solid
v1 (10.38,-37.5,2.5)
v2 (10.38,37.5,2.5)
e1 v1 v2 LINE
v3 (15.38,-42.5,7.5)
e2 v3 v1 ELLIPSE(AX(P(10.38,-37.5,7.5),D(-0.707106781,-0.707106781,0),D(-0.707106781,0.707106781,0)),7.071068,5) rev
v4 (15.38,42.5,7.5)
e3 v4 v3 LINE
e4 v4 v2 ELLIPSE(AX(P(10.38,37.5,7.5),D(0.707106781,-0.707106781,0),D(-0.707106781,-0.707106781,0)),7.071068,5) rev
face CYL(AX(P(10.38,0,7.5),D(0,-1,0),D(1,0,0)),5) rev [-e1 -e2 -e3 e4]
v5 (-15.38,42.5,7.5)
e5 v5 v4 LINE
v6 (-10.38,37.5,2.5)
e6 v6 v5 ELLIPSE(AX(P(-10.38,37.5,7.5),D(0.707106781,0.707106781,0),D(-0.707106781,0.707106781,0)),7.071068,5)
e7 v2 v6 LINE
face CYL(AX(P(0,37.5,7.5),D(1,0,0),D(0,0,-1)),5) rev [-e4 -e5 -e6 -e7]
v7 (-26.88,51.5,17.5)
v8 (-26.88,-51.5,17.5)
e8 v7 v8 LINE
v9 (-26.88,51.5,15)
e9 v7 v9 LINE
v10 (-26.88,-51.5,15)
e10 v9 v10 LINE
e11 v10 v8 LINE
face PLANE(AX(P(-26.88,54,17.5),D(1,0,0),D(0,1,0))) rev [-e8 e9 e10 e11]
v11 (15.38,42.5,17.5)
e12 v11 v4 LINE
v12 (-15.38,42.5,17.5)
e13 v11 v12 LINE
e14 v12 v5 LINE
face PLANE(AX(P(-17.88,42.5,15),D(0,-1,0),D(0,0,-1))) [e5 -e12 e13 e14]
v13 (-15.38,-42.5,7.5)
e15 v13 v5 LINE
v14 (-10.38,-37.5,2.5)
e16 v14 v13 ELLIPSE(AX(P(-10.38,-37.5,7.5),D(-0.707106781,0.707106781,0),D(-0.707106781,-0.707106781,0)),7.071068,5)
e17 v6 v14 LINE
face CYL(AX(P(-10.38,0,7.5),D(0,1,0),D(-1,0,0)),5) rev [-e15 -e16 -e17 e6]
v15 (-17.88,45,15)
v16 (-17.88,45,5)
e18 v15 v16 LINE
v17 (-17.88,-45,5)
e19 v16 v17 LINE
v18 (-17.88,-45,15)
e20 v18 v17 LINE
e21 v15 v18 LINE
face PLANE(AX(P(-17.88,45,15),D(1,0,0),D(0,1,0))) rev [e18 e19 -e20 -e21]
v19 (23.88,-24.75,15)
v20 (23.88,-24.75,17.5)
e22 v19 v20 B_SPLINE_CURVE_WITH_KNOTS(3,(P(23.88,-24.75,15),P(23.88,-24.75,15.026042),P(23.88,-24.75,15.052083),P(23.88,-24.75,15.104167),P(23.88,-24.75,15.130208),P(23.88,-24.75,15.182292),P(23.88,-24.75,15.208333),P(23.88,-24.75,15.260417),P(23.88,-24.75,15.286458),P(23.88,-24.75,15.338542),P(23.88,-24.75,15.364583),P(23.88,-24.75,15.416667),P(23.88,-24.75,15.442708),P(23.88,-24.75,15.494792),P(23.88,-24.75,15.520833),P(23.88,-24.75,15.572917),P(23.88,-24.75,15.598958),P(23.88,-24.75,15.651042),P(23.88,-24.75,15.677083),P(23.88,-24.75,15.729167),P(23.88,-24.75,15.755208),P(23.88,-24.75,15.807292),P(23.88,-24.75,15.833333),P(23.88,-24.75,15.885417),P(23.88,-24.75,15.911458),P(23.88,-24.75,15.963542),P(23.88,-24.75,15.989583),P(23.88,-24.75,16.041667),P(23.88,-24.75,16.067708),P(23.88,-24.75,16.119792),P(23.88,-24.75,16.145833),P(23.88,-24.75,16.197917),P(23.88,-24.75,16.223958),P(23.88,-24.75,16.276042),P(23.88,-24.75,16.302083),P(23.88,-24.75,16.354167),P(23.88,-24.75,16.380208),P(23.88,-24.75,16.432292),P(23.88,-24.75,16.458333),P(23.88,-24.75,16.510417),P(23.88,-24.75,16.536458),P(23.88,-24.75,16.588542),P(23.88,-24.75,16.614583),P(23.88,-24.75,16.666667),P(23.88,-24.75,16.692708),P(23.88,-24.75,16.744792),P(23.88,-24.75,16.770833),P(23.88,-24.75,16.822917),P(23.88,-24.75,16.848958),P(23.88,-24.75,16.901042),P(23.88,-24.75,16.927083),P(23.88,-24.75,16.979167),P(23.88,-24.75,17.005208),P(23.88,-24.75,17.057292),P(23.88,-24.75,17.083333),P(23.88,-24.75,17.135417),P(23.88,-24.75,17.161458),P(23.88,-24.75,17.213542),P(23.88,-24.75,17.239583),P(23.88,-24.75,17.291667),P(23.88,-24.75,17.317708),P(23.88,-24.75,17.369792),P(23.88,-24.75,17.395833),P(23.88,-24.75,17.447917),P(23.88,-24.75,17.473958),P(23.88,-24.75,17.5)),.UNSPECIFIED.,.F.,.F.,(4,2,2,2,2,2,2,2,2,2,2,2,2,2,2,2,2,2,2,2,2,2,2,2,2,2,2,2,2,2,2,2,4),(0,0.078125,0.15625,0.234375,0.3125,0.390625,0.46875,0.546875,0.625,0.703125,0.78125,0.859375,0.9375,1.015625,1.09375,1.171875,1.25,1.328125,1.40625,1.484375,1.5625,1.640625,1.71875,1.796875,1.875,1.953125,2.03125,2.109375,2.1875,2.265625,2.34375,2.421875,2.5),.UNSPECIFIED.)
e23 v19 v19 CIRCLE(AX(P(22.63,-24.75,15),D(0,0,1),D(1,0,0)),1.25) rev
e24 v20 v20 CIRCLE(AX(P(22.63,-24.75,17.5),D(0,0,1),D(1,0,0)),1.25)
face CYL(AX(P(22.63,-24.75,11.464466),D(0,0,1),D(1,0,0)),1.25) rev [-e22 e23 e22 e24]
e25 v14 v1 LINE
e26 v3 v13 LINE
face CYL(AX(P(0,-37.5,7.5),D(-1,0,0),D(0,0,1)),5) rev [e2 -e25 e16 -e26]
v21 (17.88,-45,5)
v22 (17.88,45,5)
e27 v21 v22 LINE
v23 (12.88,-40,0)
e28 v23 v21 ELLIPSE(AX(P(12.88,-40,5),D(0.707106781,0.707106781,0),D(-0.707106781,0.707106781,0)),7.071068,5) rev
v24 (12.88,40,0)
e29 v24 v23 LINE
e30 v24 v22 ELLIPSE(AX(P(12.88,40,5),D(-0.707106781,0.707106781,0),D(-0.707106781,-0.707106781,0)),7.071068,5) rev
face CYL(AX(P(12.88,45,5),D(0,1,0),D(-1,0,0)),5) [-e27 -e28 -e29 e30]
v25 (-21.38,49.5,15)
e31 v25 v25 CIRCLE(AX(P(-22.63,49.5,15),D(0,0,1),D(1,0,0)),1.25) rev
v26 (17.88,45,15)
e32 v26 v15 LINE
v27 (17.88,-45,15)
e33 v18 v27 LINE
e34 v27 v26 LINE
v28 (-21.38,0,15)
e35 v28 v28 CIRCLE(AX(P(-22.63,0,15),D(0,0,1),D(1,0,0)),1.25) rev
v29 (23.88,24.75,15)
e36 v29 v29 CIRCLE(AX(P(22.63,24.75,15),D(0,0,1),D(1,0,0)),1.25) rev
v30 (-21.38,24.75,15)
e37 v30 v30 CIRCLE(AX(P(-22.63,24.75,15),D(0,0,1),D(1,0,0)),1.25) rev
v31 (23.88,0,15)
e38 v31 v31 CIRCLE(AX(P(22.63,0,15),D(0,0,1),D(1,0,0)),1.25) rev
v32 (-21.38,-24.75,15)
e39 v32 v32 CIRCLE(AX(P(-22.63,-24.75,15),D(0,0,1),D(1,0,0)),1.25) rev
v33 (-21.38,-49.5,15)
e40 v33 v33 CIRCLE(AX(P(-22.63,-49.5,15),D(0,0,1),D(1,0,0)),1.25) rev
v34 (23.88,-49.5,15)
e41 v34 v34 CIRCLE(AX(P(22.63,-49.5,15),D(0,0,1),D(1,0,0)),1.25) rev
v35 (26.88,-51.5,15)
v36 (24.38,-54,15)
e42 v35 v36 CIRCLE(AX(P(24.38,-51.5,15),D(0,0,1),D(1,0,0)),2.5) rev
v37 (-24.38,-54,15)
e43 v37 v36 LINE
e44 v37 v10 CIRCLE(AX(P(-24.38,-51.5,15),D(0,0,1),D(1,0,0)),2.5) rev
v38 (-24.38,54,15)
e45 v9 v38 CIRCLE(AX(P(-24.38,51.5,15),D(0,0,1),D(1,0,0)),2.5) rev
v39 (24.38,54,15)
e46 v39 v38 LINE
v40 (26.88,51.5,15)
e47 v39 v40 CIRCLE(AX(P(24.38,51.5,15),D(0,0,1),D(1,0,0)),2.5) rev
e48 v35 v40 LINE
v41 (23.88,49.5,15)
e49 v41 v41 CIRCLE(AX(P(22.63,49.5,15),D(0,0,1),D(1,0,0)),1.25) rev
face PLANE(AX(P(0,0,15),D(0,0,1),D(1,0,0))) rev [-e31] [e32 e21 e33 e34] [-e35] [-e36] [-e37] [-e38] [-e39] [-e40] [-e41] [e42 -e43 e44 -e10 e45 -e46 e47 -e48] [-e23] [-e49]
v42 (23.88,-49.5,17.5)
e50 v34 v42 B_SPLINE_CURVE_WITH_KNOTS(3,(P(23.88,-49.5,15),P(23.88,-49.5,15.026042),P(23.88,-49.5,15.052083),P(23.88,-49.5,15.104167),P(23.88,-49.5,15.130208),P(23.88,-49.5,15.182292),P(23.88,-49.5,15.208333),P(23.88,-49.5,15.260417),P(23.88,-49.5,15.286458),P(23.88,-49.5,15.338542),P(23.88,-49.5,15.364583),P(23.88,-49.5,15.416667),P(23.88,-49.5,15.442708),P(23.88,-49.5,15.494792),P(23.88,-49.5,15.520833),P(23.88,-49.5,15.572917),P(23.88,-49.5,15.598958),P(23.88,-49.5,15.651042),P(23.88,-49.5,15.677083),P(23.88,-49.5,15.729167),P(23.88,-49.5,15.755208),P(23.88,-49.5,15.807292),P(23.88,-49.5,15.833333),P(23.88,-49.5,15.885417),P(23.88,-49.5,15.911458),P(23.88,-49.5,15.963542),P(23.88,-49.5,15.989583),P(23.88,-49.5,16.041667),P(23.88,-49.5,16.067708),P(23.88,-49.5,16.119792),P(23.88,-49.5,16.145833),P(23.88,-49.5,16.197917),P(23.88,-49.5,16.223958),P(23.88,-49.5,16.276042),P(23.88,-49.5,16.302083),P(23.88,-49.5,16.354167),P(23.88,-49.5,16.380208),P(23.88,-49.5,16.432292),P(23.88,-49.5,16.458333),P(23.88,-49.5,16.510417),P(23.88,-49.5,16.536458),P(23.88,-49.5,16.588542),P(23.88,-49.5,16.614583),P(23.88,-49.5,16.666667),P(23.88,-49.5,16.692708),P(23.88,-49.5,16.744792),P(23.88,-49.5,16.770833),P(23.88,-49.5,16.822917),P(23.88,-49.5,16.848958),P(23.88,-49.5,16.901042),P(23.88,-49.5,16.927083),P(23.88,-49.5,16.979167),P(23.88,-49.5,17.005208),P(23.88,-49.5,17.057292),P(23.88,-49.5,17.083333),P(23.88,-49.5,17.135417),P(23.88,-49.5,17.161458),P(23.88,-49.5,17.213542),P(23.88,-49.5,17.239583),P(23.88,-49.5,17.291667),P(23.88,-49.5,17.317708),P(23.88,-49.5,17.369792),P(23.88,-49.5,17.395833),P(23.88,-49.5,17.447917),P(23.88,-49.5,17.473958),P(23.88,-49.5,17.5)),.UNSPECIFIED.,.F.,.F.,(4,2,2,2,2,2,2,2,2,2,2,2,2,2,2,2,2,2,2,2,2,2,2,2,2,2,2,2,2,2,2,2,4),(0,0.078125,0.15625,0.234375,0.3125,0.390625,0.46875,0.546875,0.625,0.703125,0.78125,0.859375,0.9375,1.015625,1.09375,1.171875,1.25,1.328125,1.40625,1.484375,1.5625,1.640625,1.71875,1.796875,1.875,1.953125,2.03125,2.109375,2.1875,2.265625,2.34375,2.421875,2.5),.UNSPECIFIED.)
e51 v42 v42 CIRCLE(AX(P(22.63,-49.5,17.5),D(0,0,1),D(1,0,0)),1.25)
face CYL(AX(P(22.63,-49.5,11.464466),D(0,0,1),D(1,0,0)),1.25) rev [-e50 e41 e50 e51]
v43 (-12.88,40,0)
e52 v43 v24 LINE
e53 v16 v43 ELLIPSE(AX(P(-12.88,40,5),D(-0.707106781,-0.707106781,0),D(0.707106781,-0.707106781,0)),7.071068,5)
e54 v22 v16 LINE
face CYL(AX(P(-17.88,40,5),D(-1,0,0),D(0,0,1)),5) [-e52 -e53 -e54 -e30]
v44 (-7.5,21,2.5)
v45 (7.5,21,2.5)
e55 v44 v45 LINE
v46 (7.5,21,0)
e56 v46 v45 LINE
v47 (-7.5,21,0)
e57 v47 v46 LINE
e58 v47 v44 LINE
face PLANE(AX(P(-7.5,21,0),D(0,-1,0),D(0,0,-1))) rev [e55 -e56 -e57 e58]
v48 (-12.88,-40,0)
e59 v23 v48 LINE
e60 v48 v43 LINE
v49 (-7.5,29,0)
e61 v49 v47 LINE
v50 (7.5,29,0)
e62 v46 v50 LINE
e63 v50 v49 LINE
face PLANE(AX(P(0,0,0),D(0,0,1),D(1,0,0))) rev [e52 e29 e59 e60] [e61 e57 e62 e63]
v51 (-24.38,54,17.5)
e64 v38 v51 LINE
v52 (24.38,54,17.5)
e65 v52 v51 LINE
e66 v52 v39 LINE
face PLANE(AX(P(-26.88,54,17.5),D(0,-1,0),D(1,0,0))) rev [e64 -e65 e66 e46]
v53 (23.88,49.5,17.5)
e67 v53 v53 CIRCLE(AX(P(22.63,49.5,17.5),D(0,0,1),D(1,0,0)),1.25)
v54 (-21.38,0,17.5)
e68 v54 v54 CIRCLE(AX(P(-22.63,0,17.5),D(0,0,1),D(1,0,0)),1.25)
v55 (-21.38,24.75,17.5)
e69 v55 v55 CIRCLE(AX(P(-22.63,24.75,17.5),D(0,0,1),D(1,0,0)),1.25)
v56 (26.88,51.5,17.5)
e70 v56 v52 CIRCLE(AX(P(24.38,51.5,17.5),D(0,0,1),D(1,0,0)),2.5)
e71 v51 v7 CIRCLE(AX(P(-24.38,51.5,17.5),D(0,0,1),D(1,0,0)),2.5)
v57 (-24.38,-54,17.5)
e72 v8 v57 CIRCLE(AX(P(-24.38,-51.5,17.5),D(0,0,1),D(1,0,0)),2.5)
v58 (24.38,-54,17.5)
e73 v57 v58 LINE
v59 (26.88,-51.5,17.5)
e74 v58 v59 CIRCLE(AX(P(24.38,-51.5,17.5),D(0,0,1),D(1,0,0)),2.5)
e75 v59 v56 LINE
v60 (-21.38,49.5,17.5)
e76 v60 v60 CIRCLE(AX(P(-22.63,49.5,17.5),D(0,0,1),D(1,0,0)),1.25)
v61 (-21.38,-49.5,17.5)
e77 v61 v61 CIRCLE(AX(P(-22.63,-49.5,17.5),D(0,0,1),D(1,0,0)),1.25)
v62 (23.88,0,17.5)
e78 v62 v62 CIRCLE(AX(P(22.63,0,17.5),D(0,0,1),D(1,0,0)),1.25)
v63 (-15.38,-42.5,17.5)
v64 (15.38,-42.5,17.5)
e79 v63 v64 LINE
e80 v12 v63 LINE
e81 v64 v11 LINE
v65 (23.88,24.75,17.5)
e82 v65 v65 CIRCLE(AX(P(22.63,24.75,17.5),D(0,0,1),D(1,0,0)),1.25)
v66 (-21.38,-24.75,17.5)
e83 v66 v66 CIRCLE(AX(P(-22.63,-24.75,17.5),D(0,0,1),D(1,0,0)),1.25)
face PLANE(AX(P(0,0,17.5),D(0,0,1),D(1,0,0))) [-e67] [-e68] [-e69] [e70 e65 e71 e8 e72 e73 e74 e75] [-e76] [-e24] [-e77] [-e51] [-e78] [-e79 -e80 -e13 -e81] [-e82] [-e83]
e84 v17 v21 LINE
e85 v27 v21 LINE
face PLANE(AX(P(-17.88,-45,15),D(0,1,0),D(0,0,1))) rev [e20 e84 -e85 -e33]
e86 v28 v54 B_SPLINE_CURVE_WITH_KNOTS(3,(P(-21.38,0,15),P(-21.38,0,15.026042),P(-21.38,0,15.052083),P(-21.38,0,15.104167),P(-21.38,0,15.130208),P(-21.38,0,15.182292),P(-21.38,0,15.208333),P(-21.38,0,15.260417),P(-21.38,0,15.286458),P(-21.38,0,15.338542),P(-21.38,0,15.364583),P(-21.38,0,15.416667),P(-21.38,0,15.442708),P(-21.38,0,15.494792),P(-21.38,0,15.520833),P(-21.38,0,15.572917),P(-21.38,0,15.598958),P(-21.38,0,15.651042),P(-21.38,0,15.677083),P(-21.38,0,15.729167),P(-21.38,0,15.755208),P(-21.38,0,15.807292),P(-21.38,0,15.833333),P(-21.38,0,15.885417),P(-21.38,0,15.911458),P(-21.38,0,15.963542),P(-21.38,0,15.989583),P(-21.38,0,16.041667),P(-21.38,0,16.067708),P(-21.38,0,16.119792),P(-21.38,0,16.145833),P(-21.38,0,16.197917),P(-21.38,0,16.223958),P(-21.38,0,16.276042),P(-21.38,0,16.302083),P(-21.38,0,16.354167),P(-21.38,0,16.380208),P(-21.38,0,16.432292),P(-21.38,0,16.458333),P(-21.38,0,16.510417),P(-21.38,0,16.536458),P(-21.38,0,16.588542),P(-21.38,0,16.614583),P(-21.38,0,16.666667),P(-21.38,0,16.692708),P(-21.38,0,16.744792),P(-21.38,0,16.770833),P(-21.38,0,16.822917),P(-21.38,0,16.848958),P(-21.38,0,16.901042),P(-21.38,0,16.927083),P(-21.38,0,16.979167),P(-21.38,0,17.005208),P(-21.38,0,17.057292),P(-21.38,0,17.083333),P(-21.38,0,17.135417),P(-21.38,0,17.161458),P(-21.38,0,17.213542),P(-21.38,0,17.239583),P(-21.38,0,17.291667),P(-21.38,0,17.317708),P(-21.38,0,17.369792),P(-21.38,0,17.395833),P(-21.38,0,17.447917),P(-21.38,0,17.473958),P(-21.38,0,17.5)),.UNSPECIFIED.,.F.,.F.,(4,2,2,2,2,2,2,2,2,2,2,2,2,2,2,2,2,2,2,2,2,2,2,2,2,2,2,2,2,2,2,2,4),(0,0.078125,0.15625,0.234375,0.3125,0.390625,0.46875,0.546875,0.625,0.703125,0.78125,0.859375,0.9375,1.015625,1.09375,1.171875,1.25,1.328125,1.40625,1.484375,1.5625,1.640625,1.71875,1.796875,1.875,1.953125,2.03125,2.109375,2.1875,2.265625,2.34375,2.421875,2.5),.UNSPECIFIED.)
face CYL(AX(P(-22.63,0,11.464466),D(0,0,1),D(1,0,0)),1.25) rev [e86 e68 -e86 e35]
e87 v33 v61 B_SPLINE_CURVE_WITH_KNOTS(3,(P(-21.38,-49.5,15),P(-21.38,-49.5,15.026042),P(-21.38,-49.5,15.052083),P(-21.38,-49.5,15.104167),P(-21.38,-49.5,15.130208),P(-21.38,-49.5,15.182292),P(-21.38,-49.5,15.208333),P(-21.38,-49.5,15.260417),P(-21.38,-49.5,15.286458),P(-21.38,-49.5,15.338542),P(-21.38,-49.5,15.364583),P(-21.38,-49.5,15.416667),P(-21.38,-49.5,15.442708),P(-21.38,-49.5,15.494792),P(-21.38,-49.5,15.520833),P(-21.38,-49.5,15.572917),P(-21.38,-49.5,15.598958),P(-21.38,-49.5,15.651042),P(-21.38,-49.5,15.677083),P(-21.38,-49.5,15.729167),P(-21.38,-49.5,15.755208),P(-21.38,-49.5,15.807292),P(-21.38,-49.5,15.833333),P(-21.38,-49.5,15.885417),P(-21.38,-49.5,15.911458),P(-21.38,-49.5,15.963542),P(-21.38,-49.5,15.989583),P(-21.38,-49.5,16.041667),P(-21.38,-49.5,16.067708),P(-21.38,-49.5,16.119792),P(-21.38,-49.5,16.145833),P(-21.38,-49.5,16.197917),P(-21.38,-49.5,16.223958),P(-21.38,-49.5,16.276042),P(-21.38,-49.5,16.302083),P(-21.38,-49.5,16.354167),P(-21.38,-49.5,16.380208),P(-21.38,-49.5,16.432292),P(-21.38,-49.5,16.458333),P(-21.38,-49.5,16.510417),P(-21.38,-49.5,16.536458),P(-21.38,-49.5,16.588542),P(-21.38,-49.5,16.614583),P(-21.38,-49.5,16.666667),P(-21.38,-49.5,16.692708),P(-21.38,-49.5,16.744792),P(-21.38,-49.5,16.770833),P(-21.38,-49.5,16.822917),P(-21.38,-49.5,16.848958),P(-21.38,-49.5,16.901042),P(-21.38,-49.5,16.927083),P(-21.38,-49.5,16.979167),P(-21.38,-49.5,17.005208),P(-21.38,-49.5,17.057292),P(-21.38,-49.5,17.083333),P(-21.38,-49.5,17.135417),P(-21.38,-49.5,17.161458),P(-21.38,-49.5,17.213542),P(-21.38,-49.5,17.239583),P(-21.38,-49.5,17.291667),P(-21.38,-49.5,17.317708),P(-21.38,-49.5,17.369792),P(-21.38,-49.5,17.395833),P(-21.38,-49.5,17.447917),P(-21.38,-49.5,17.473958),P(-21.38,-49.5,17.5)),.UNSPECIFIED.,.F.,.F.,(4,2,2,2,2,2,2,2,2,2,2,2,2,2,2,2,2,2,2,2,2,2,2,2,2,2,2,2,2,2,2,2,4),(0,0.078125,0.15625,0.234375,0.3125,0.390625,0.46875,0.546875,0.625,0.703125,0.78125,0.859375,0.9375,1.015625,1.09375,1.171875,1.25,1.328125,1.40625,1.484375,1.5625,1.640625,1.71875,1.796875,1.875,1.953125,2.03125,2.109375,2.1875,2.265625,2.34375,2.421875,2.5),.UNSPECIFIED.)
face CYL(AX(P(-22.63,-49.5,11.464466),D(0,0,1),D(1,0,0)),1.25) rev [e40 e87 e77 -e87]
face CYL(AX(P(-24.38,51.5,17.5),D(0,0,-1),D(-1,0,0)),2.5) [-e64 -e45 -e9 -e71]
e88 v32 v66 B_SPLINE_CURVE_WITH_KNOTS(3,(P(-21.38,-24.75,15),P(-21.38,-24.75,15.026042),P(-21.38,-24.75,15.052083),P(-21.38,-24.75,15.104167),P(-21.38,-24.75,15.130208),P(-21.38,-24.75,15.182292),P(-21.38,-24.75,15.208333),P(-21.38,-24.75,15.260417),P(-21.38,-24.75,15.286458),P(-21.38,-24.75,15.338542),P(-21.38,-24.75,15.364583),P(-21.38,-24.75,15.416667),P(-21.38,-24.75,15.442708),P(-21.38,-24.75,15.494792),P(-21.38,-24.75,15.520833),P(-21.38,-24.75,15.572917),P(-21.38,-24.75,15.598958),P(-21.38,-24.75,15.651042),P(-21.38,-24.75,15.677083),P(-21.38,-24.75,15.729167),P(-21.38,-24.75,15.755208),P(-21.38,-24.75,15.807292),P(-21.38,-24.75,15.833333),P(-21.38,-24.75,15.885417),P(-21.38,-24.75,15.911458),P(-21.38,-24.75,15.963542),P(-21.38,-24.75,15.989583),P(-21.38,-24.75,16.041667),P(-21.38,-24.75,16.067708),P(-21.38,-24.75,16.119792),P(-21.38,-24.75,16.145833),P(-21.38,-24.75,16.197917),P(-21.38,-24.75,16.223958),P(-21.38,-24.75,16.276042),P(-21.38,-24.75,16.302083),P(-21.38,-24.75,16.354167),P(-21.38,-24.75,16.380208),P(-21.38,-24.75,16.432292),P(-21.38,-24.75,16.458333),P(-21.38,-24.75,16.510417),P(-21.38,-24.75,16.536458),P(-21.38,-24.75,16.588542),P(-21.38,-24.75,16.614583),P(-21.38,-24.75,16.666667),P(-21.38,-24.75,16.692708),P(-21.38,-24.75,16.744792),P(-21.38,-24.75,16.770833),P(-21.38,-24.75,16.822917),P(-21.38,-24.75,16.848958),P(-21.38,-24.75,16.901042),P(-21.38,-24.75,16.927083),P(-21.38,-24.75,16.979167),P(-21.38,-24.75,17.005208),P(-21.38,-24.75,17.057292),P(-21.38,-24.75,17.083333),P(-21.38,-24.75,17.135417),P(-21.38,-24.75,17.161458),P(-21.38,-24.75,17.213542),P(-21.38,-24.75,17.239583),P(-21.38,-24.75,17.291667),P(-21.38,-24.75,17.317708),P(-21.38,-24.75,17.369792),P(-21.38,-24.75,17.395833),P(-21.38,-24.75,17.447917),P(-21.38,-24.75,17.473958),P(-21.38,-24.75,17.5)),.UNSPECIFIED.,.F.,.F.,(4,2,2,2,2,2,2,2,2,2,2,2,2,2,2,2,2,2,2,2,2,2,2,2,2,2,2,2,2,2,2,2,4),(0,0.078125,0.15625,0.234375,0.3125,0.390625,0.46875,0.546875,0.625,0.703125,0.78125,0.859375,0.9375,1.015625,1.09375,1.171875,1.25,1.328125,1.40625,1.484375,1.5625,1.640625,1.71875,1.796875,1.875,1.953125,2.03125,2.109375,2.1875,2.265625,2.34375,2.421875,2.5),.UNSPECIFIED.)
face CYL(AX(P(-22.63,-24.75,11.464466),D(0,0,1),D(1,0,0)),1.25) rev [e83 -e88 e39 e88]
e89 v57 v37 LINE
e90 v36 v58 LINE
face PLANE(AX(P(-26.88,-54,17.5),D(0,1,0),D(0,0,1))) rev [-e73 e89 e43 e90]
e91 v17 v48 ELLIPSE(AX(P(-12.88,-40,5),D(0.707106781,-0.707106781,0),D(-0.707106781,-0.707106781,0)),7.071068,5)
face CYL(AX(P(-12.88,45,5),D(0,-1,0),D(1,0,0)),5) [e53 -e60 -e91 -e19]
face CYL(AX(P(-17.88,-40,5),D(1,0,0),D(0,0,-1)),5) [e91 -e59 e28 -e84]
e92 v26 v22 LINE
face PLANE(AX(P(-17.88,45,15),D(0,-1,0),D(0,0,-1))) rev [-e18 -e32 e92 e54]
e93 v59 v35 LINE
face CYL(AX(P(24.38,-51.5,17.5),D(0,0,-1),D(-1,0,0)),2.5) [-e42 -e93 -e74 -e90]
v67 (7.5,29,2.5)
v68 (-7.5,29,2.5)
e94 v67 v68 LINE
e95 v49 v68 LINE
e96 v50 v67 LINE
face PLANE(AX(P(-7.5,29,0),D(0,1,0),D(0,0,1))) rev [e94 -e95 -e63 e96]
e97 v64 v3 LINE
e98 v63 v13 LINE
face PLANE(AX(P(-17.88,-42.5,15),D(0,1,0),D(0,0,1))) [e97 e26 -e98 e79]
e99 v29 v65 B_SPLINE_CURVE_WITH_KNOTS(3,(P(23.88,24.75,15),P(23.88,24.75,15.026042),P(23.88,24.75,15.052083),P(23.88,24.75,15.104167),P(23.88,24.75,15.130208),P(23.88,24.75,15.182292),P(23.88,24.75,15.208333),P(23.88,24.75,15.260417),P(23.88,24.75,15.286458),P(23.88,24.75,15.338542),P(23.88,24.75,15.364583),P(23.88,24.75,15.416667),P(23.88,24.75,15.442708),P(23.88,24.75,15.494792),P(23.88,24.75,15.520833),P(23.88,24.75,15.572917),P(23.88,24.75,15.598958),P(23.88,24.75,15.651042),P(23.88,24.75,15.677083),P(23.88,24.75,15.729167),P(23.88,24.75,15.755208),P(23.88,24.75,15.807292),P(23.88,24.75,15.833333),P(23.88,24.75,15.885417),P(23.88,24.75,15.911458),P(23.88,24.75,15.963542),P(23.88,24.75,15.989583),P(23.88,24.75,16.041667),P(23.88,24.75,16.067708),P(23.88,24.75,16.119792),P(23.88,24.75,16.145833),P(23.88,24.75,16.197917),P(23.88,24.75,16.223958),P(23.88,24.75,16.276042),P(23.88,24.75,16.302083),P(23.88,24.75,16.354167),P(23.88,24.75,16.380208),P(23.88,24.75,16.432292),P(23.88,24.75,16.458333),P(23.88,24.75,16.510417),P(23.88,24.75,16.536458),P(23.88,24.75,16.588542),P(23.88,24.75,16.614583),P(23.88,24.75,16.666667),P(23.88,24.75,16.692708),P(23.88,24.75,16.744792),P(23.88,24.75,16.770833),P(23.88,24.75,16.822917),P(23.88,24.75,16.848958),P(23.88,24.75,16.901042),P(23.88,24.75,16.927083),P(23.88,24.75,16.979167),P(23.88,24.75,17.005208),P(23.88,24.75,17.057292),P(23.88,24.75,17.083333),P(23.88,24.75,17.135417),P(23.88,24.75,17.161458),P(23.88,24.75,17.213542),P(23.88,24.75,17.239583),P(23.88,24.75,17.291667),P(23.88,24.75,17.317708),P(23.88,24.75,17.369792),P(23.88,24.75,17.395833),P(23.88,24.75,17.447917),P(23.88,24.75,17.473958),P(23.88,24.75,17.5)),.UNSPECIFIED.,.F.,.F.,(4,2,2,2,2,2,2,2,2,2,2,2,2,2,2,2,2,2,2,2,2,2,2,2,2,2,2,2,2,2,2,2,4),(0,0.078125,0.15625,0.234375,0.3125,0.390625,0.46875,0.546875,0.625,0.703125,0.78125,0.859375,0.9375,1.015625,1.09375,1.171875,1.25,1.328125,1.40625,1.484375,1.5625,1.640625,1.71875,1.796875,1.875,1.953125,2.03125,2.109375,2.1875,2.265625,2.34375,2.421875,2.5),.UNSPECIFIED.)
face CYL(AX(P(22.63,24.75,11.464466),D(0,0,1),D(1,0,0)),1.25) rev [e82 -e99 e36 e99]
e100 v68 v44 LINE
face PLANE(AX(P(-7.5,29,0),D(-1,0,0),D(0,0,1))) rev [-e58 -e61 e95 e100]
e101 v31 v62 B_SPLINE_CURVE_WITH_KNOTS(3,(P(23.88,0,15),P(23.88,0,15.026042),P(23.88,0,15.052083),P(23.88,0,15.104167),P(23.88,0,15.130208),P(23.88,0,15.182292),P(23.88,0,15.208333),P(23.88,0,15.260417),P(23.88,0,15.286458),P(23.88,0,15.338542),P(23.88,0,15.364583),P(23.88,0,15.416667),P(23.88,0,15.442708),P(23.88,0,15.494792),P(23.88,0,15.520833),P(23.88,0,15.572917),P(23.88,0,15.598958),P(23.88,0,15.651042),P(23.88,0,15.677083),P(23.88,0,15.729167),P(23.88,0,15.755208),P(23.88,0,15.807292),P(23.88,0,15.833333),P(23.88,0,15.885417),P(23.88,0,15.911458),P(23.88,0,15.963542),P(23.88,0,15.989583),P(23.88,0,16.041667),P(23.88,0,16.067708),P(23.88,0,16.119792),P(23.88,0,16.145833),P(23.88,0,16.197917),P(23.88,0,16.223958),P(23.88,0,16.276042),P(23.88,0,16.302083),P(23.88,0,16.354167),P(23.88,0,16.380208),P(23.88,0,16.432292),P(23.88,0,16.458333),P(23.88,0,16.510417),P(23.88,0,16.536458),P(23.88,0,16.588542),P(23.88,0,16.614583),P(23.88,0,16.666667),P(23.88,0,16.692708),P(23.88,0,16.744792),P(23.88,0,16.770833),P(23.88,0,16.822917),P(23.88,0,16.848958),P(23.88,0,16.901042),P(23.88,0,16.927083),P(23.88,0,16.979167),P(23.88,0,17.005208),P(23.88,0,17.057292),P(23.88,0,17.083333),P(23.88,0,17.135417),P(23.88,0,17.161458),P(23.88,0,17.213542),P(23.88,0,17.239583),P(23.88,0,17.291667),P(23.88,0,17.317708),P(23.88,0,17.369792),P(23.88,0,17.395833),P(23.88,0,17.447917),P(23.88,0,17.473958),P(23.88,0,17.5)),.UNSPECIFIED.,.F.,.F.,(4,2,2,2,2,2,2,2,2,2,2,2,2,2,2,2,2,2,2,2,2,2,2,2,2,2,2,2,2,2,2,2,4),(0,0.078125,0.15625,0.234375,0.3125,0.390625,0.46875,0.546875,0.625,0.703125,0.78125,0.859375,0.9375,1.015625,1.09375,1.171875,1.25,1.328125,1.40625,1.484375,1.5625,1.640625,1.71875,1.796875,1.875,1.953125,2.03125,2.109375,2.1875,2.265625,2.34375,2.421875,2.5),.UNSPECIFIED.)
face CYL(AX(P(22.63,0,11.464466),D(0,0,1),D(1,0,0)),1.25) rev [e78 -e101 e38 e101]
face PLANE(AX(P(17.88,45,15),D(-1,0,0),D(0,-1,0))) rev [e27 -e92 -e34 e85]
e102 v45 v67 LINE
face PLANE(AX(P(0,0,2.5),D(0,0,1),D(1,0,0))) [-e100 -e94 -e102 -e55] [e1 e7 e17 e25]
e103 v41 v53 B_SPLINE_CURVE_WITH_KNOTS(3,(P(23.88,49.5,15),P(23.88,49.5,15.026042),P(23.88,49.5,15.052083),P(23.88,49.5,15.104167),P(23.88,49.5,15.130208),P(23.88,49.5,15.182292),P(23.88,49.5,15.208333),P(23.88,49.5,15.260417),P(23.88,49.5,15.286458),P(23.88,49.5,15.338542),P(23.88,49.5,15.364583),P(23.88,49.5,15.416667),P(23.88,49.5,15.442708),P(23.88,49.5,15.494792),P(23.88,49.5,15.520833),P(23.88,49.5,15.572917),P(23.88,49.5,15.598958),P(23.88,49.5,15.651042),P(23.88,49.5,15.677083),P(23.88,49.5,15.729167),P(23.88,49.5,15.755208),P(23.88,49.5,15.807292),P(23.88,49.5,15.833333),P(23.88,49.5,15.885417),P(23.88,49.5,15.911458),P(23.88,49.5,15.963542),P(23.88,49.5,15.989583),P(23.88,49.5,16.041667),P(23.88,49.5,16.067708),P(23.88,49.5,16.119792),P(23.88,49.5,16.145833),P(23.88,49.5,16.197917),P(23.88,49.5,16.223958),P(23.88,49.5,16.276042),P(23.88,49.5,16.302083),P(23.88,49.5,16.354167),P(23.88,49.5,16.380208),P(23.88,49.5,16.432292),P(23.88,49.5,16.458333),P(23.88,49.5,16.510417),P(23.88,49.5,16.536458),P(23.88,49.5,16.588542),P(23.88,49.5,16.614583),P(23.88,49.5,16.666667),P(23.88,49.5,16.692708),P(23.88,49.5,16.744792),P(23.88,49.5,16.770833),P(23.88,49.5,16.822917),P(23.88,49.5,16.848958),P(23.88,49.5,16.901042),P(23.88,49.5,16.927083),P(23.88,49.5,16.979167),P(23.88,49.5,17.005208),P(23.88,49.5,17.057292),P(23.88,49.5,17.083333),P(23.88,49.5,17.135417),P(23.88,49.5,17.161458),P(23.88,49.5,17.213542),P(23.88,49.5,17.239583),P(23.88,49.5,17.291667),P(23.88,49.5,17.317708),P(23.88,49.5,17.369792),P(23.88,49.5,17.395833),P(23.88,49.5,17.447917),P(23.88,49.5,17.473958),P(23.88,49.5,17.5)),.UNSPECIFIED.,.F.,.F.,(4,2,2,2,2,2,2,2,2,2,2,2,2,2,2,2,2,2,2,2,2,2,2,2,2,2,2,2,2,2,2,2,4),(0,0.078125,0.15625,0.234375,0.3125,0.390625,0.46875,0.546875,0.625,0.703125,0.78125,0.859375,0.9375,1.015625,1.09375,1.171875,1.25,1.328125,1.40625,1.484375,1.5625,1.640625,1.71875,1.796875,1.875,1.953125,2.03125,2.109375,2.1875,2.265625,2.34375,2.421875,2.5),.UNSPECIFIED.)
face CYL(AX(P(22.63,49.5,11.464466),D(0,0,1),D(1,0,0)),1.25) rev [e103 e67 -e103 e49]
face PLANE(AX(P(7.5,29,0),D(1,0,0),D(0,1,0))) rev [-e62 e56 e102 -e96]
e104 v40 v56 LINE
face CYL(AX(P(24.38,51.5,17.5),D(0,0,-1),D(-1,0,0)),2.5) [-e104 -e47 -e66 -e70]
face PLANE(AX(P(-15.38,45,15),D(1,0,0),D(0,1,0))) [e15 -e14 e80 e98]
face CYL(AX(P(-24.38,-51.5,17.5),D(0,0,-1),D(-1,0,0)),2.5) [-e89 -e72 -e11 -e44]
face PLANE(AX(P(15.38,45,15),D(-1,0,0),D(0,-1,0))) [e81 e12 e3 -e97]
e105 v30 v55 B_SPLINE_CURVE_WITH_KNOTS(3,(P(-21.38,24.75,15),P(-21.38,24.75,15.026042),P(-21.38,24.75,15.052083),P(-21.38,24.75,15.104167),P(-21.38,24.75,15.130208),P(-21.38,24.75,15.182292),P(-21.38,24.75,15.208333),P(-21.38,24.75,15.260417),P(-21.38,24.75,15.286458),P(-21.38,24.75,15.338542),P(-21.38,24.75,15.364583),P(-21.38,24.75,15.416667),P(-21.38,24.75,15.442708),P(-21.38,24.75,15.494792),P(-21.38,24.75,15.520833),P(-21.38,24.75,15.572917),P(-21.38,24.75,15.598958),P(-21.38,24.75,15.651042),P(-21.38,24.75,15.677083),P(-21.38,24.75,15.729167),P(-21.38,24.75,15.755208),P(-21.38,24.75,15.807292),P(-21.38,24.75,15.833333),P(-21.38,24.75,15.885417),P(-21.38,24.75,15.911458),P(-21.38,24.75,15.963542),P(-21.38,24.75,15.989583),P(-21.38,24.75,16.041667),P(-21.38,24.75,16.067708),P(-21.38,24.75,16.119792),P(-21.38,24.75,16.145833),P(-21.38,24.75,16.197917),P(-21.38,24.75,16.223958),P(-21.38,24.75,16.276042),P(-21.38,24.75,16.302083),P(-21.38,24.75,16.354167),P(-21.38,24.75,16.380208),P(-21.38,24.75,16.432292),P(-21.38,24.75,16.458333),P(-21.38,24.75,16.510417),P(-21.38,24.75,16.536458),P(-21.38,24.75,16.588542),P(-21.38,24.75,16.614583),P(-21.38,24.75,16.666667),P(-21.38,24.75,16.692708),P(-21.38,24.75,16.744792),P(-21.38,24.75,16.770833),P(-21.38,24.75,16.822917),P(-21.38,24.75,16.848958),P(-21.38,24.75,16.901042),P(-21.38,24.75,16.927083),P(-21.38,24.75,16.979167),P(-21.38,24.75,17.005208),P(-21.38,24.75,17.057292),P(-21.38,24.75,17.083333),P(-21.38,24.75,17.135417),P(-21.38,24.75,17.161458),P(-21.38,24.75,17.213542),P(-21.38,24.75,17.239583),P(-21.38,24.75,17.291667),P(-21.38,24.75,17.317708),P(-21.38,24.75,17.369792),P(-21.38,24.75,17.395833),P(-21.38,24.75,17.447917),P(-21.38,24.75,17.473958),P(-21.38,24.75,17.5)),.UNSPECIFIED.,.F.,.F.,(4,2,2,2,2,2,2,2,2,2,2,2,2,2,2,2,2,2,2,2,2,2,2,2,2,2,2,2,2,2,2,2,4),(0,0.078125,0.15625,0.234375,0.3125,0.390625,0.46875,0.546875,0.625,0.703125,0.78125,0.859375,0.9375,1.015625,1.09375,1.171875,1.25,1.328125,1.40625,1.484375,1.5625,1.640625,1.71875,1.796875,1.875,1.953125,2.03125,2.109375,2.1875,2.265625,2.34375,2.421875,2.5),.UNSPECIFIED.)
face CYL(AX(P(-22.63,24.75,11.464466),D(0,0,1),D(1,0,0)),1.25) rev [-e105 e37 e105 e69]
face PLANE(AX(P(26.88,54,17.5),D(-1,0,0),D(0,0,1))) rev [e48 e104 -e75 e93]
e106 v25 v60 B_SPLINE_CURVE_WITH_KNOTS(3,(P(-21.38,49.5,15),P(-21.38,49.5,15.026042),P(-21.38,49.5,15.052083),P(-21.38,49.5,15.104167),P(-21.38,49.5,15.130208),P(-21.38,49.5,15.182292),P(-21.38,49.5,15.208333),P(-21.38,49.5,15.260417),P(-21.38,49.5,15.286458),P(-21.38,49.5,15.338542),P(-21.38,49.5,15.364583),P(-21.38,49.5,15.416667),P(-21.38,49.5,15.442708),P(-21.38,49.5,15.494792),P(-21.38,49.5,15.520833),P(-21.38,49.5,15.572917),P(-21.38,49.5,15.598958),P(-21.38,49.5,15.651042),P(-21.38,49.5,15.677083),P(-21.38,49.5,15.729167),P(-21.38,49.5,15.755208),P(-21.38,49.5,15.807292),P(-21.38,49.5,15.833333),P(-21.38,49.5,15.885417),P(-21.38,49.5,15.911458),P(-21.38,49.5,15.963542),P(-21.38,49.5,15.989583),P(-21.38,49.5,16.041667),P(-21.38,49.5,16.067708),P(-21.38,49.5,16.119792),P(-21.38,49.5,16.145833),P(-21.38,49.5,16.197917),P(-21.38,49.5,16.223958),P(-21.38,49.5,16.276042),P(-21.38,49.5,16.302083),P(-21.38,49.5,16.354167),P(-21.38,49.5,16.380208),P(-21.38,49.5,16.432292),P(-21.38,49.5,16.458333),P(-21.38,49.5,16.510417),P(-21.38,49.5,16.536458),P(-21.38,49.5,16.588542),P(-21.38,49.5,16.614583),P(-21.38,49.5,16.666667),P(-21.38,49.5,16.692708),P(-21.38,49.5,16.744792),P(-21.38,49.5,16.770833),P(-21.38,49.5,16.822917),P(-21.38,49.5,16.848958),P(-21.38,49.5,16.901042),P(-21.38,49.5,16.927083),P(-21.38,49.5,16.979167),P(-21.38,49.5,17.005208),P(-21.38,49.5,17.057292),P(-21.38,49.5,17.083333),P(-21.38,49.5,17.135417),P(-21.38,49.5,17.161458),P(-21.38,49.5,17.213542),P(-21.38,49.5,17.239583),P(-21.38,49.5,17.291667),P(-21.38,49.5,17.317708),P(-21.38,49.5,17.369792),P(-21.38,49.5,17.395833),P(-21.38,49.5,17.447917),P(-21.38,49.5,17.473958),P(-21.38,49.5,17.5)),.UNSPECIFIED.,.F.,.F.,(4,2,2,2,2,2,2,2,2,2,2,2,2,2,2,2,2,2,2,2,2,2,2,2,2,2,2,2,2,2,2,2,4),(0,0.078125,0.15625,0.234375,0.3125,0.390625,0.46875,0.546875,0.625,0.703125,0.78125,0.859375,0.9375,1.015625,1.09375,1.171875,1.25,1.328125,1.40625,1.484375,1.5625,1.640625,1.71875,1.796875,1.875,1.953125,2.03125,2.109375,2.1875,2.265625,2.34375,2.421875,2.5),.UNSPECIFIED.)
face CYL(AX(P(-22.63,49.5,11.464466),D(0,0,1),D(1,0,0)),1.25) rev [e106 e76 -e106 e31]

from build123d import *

# Parameters (mm, degrees)
SKETCH1_W           = 35.76
SKETCH1_H           = 90
BOSS_EXTRUDE1_DEPTH = 15
SKETCH2_W           = 53.76
SKETCH2_H           = 108
BOSS_EXTRUDE2_DEPTH = 2.5
SHELL1_START        = -15.38
SHELL1_OUTLINE_W    = 85
SHELL1_OUTLINE_H    = 15
SHELL1_DEPTH        = 30.76
FILLET1_R           = 2.5
FILLET2_R           = 5
SKETCH3_W           = 15
SKETCH3_H           = 8
CUT_EXTRUDE1_DEPTH  = 63.15733585
SKETCH4_R           = 1.25
CUT_EXTRUDE2_DEPTH  = 2.5


# Read off the part's stored shape, not the designer's step: Shell1
with BuildPart() as part:
    # Sketch1 → Boss-Extrude1 (new body)
    with BuildSketch(Plane.XY):
        Rectangle(SKETCH1_W, SKETCH1_H)
    extrude(amount=BOSS_EXTRUDE1_DEPTH)

    # Sketch2 → Boss-Extrude2 (add)
    with BuildSketch(Plane.XY.offset(15)):
        Rectangle(SKETCH2_W, SKETCH2_H)
    extrude(amount=BOSS_EXTRUDE2_DEPTH)

    # Shell1 outline → Shell1 (cut)
    with BuildSketch(Plane.YZ.offset(SHELL1_START)):
        with Locations((0, 10)):
            Rectangle(SHELL1_OUTLINE_W, SHELL1_OUTLINE_H)
    extrude(amount=SHELL1_DEPTH, mode=Mode.SUBTRACT)

    # Fillet1
    fillet1_edges = [part.edges().sort_by_distance(p)[0] for p in [
        (26.88, -54, 16.25),
        (26.88, 54, 16.25),
        (-26.88, 54, 16.25),
        (-26.88, -54, 16.25),
    ]]
    fillet(fillet1_edges, radius=FILLET1_R)

    # Fillet2
    fillet2_edges = [part.edges().sort_by_distance(p)[0] for p in [
        (15.38, 0, 2.5),
        (0, 42.5, 2.5),
        (-15.38, 0, 2.5),
        (0, -42.5, 2.5),
        (0, -45, 0),
        (-17.88, 0, 0),
        (0, 45, 0),
        (17.88, 0, 0),
    ]]
    fillet(fillet2_edges, radius=FILLET2_R)

    # Sketch3 → Cut-Extrude1 (cut, through all)
    with BuildSketch(Plane.XY.offset(2.5)):
        with Locations((0, 25)):
            Rectangle(SKETCH3_W, SKETCH3_H)
    extrude(amount=-CUT_EXTRUDE1_DEPTH, mode=Mode.SUBTRACT)

    # Sketch4 → Cut-Extrude2 (cut)
    with BuildSketch(Plane.XY.offset(17.5)):
        with Locations((-22.63, 49.5)):
            Circle(SKETCH4_R)
        with Locations((22.63, 49.5)):
            Circle(SKETCH4_R)
        with Locations((22.63, 24.75)):
            Circle(SKETCH4_R)
        with Locations((22.63, 0)):
            Circle(SKETCH4_R)
        with Locations((22.63, -24.75)):
            Circle(SKETCH4_R)
        with Locations((22.63, -49.5)):
            Circle(SKETCH4_R)
        with Locations((-22.63, 24.75)):
            Circle(SKETCH4_R)
        with Locations((-22.63, 0)):
            Circle(SKETCH4_R)
        with Locations((-22.63, -24.75)):
            Circle(SKETCH4_R)
        with Locations((-22.63, -49.5)):
            Circle(SKETCH4_R)
    extrude(amount=-CUT_EXTRUDE2_DEPTH, mode=Mode.SUBTRACT)


solid = part.part
